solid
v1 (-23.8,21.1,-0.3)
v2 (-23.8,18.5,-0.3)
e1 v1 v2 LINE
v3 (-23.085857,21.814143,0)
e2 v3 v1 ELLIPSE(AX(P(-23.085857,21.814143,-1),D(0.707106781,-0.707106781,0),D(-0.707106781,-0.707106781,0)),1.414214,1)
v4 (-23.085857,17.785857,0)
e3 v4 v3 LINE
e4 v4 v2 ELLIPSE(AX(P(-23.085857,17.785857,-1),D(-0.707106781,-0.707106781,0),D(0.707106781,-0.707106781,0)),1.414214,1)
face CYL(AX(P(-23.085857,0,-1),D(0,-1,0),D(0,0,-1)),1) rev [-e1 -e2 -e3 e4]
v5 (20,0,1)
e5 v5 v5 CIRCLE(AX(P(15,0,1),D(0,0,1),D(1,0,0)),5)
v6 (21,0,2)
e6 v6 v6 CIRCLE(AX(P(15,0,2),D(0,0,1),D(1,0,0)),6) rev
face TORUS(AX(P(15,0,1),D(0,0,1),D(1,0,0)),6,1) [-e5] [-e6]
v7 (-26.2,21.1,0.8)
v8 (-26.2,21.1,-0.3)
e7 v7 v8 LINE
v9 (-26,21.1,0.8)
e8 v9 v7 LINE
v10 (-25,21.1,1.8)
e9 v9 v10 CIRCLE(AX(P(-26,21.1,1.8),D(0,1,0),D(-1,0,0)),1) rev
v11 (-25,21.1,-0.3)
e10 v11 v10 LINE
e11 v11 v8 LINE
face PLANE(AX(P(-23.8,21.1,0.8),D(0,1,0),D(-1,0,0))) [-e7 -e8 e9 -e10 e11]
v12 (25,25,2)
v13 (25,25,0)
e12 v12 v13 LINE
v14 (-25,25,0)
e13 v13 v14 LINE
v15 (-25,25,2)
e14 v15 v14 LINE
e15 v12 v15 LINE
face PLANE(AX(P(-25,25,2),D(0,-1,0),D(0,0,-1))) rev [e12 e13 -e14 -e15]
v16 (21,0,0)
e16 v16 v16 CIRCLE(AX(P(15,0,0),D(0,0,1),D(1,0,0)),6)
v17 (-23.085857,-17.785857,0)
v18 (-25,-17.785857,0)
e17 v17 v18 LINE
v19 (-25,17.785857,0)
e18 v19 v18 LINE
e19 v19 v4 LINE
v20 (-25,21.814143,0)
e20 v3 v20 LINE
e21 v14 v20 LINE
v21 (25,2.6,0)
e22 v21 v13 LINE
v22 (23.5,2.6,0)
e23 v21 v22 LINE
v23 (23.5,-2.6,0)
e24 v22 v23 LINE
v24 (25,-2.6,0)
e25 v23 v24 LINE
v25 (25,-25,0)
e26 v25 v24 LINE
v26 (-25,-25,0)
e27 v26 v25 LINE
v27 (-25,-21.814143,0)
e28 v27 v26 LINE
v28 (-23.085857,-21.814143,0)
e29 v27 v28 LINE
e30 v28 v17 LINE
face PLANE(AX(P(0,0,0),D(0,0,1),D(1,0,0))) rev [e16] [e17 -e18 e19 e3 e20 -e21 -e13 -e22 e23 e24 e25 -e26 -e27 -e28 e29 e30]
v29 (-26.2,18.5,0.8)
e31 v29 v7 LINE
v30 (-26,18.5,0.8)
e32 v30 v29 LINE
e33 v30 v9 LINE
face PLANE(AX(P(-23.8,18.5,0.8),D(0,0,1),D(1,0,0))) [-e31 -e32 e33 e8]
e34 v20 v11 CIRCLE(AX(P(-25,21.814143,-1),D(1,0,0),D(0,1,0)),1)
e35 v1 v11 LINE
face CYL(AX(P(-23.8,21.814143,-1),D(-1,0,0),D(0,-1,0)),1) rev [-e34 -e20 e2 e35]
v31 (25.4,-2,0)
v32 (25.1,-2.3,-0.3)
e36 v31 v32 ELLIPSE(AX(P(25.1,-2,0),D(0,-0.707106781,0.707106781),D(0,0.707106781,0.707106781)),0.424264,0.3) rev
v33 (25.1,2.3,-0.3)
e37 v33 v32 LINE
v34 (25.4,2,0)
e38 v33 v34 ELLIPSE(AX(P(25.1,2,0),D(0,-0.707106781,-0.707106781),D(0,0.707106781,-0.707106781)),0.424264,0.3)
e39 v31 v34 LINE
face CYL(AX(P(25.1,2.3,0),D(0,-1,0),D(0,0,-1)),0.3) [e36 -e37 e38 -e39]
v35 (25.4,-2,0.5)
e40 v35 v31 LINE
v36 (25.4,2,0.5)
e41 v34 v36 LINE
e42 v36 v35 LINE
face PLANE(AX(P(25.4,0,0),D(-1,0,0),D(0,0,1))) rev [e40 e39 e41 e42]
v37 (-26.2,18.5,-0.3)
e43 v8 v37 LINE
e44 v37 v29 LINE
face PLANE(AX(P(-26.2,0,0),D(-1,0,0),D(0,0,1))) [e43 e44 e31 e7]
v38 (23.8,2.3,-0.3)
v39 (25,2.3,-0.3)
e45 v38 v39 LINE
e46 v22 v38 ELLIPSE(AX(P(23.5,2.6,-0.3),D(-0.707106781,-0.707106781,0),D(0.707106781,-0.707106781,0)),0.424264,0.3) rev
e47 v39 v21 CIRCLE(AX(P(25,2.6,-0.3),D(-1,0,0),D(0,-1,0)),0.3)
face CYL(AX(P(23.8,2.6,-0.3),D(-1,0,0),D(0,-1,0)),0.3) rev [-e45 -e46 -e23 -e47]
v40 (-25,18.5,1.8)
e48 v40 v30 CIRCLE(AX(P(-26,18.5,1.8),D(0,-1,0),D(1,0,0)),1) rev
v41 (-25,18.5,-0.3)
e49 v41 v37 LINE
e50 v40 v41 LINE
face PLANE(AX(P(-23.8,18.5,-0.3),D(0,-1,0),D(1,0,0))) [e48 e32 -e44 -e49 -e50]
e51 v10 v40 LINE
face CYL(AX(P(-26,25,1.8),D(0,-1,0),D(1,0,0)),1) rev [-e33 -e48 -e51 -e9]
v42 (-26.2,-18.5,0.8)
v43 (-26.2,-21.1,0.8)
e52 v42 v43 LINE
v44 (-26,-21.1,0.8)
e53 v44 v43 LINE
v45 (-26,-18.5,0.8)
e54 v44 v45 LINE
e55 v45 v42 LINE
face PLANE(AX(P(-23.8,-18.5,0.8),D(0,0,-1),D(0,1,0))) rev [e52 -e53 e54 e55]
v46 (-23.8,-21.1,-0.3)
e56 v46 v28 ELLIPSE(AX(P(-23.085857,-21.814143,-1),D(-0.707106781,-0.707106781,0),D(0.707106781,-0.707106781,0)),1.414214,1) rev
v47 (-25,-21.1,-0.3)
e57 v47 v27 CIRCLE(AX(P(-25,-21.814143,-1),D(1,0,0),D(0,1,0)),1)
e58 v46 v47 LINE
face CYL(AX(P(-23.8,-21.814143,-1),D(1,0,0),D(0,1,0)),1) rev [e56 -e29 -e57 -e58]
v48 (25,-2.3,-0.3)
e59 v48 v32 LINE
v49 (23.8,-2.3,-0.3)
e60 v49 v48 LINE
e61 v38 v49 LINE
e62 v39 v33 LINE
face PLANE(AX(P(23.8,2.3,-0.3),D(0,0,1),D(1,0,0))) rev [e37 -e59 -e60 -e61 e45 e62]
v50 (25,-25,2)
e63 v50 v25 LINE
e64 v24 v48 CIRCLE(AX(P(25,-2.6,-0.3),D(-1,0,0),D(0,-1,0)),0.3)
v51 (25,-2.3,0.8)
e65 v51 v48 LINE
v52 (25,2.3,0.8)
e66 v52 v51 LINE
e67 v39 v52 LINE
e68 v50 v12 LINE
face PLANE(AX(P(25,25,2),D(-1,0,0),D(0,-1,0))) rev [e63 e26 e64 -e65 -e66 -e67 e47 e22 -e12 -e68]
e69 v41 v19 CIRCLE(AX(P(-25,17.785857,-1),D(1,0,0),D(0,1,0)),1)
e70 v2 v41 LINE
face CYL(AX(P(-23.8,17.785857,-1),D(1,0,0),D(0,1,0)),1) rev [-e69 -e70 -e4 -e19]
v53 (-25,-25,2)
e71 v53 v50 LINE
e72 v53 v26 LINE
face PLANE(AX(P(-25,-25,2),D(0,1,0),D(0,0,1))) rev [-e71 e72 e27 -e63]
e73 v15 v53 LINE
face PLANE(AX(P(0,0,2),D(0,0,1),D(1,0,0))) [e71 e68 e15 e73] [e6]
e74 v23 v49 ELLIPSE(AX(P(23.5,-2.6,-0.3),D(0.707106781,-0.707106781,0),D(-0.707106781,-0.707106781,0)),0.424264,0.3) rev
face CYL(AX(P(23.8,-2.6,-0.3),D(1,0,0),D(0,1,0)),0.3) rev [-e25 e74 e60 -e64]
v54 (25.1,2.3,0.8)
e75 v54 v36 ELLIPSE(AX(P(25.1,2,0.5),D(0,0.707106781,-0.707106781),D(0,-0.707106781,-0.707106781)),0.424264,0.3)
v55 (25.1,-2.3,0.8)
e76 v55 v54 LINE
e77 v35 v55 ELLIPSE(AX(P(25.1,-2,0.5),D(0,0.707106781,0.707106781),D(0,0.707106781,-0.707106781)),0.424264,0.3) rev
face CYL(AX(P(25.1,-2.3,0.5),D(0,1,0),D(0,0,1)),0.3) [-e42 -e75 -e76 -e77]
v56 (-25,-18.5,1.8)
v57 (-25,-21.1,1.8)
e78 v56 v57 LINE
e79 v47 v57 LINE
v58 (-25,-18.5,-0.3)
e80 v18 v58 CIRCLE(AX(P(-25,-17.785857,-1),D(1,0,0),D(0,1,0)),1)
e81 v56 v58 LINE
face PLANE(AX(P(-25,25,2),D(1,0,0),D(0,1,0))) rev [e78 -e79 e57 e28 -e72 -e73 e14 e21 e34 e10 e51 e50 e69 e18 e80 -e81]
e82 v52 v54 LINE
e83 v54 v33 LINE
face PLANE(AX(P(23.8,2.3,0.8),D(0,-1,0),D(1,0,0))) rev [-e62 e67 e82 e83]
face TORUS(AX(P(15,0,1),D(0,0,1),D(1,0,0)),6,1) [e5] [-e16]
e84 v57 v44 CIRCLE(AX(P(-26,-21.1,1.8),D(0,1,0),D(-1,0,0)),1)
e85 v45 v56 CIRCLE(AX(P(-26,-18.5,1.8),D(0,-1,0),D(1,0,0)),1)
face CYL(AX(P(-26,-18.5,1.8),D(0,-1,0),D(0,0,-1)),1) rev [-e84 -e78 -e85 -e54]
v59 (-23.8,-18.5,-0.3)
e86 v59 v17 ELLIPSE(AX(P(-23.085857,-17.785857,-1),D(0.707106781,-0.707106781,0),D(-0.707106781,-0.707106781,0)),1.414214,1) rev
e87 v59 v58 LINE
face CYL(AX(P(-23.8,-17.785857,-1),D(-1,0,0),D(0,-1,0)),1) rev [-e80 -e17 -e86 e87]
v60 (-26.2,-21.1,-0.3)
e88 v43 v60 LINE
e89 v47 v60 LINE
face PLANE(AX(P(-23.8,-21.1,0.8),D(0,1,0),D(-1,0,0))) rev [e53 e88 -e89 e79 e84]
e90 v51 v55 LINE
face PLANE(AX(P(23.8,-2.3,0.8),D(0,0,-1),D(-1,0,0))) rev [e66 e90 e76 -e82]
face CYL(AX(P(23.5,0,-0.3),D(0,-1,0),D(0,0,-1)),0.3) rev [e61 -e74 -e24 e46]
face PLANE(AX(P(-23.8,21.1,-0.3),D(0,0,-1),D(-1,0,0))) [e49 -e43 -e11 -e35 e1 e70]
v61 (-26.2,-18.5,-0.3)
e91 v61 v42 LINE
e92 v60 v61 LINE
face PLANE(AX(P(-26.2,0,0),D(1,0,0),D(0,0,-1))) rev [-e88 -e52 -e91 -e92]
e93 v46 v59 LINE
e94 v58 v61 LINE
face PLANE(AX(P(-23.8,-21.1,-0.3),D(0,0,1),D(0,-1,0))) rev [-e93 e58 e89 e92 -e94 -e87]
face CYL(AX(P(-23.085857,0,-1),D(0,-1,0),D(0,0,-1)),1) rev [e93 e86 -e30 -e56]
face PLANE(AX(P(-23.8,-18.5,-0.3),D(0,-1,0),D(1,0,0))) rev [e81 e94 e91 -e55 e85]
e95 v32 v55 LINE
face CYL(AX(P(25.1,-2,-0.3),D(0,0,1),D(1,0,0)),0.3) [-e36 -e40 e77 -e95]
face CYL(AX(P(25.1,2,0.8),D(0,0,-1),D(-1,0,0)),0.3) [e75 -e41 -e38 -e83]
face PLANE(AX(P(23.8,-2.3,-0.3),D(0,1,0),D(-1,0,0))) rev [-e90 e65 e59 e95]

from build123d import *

# Parameters (mm, degrees)
SKETCH1_W                = 50
SKETCH1_H                = 50
BOSS_EXTRUDE1_DEPTH      = 2
BOSS_EXTRUDE2_DEPTH      = 1.2
BOSS_EXTRUDE2_DEPTH_BACK = 1.2
SKETCH3_W                = 1.1
SKETCH3_H                = 2.6
FILLET1_R                = 1
BOSS_EXTRUDE3_DEPTH      = 0.4
BOSS_EXTRUDE3_DEPTH_BACK = 1.2
SKETCH6_W                = 1.1
SKETCH6_H                = 4.6
FILLET2_R                = 0.3
FILLET3_R                = 0.3
CUT_EXTRUDE1_REACH       = 38.287
SKETCH7_R                = 5
FILLET5_R                = 1


# Some blends are built 0.0001 mm under size
with BuildPart() as part:
    # Sketch1 → Boss-Extrude1 (new body)
    with BuildSketch(Plane.XY):
        Rectangle(SKETCH1_W, SKETCH1_H)
    extrude(amount=BOSS_EXTRUDE1_DEPTH)

    # Sketch3 → Boss-Extrude2 (add, two sides: drawn at the far end of the back side and taken through both)
    with BuildSketch(Plane.ZY.offset(25).offset(-BOSS_EXTRUDE2_DEPTH_BACK)):
        with Locations((0.25, 19.8)):
            Rectangle(SKETCH3_W, SKETCH3_H)
        with Locations((0.25, -19.8)):
            Rectangle(SKETCH3_W, SKETCH3_H)
    extrude(amount=BOSS_EXTRUDE2_DEPTH + BOSS_EXTRUDE2_DEPTH_BACK)

    # Fillet1
    # the kernel refuses this fillet: 1 mm, written as the material it adds along each edge
    with BuildSketch(Plane(origin=(-23.8, 21.1, 0), x_dir=(0, 1, 0), z_dir=(-1, 0, 0)), Plane(origin=(-25, 18.5, 0), x_dir=(0, -1, 0), z_dir=(1, 0, 0))) as fillet1_piece_1:
        with BuildLine():
            CenterArc((0.714142843, 1), FILLET1_R, 224.427004001, 45.572995999)
            Line((0, 0.3), (-0.014282857, 0.286))
            ThreePointArc((-0.014282857, 0.286), (-0.02, 0.15), (-0.02, 0))
            Line((-0.02, 0), (0, -0.02))
            Line((0, -0.02), (0.714142843, -0.02))
            Line((0.714142843, -0.02), (0.714142843, 0))
        make_face()
    extrude(amount=1.2)
    with BuildSketch(Plane(origin=(-23.8, -21.1, 0), x_dir=(0, -1, 0), z_dir=(-1, 0, 0)), Plane(origin=(-25, -18.5, 0), x_dir=(0, 1, 0), z_dir=(1, 0, 0))) as fillet1_piece_2:
        with BuildLine():
            CenterArc((0.714142843, -1), FILLET1_R, 90, 45.572995999)
            Line((0, -0.3), (-0.014282857, -0.286))
            ThreePointArc((-0.014282857, -0.286), (-0.02, -0.15), (-0.02, 0))
            Line((-0.02, 0), (0, 0.02))
            Line((0, 0.02), (0.714142843, 0.02))
            Line((0.714142843, 0.02), (0.714142843, 0))
        make_face()
    extrude(amount=1.2)
    with BuildSketch(Plane(origin=(-23.8, -18.5, 0), x_dir=(1, 0, 0), z_dir=(0, -1, 0))) as fillet1_piece_3:
        with BuildLine():
            CenterArc((0.714142843, -1), FILLET1_R, 90, 45.572995999)
            Line((0, -0.3), (-0.014282857, -0.286))
            ThreePointArc((-0.014282857, -0.286), (-0.02, -0.15), (-0.02, 0))
            Line((-0.02, 0), (0, 0.02))
            Line((0, 0.02), (0.714142843, 0.02))
            Line((0.714142843, 0.02), (0.714142843, 0))
        make_face()
    extrude(amount=2.6)
    with BuildSketch(Plane(origin=(-23.8, 18.5, 0), x_dir=(1, 0, 0), z_dir=(0, 1, 0))) as fillet1_piece_4:
        with BuildLine():
            CenterArc((0.714142843, 1), FILLET1_R, 224.427004001, 45.572995999)
            Line((0, 0.3), (-0.014282857, 0.286))
            ThreePointArc((-0.014282857, 0.286), (-0.02, 0.15), (-0.02, 0))
            Line((-0.02, 0), (0, -0.02))
            Line((0, -0.02), (0.714142843, -0.02))
            Line((0.714142843, -0.02), (0.714142843, 0))
        make_face()
    extrude(amount=2.6)
    with BuildSketch(Plane(origin=(-25, -21.1, 0.8), x_dir=(0, 0, 1), z_dir=(0, 1, 0))) as fillet1_piece_5:
        with BuildLine():
            CenterArc((FILLET1_R, -FILLET1_R), FILLET1_R, 90, 90)
            Line((0, -FILLET1_R), (-FILLET1_R * 0.02, -FILLET1_R))
            Line((-FILLET1_R * 0.02, -FILLET1_R), (-FILLET1_R * 0.02, FILLET1_R * 0.02))
            Line((-FILLET1_R * 0.02, FILLET1_R * 0.02), (FILLET1_R, FILLET1_R * 0.02))
            Line((FILLET1_R, FILLET1_R * 0.02), (FILLET1_R, 0))
        make_face()
    extrude(amount=2.6)
    with BuildSketch(Plane(origin=(-25, 21.1, 0.8), x_dir=(0, 0, 1), z_dir=(0, -1, 0))) as fillet1_piece_6:
        with BuildLine():
            CenterArc((FILLET1_R, FILLET1_R), FILLET1_R, 180, 90)
            Line((0, FILLET1_R), (-FILLET1_R * 0.02, FILLET1_R))
            Line((-FILLET1_R * 0.02, FILLET1_R), (-FILLET1_R * 0.02, -FILLET1_R * 0.02))
            Line((-FILLET1_R * 0.02, -FILLET1_R * 0.02), (FILLET1_R, -FILLET1_R * 0.02))
            Line((FILLET1_R, -FILLET1_R * 0.02), (FILLET1_R, 0))
        make_face()
    extrude(amount=2.6)
    with BuildSketch(Plane(origin=(-22.014642893, 21.1, 0), x_dir=(0, 1, 0), z_dir=(-1, 0, 0))) as fillet1_piece_7a_section:
        with BuildLine():
            CenterArc((0.714142843, 1), FILLET1_R, 224.427004001, 45.572995999)
            Line((0, 0.3), (-0.014282857, 0.286))
            ThreePointArc((-0.014282857, 0.286), (-0.02, 0.15), (-0.02, 0))
            Line((-0.02, 0), (0, -0.02))
            Line((0, -0.02), (0.714142843, -0.02))
            Line((0.714142843, -0.02), (0.714142843, 0))
        make_face()
    fillet1_piece_7a = extrude(amount=2.985357107, mode=Mode.PRIVATE)
    fillet1_piece_7a = split(fillet1_piece_7a, bisect_by=Plane(origin=(-23.8, 21.290996304, -0.074177971), z_dir=(1, 0, 0)), keep=Keep.TOP, mode=Mode.PRIVATE)
    with BuildSketch(Plane(origin=(-23.8, 18.5, 0), x_dir=(1, 0, 0), z_dir=(0, 1, 0))) as fillet1_piece_7b_section:
        with BuildLine():
            CenterArc((0.714142843, 1), FILLET1_R, 224.427004001, 45.572995999)
            Line((0, 0.3), (-0.014282857, 0.286))
            ThreePointArc((-0.014282857, 0.286), (-0.02, 0.15), (-0.02, 0))
            Line((-0.02, 0), (0, -0.02))
            Line((0, -0.02), (0.714142843, -0.02))
            Line((0.714142843, -0.02), (0.714142843, 0))
        make_face()
    fillet1_piece_7b = extrude(amount=4.385357107, mode=Mode.PRIVATE)
    fillet1_piece_7b = split(fillet1_piece_7b, bisect_by=Plane(origin=(-23.609003696, 21.1, -0.074177971), z_dir=(0, 1, 0)), keep=Keep.TOP, mode=Mode.PRIVATE)
    fillet1_piece_7 = fillet1_piece_7a & fillet1_piece_7b
    add(fillet1_piece_7)
    with BuildSketch(Plane(origin=(-23.8, 16.714642893, 0), x_dir=(1, 0, 0), z_dir=(0, 1, 0))) as fillet1_piece_8a_section:
        with BuildLine():
            CenterArc((0.714142843, 1), FILLET1_R, 224.427004001, 45.572995999)
            Line((0, 0.3), (-0.014282857, 0.286))
            ThreePointArc((-0.014282857, 0.286), (-0.02, 0.15), (-0.02, 0))
            Line((-0.02, 0), (0, -0.02))
            Line((0, -0.02), (0.714142843, -0.02))
            Line((0.714142843, -0.02), (0.714142843, 0))
        make_face()
    fillet1_piece_8a = extrude(amount=4.385357107, mode=Mode.PRIVATE)
    fillet1_piece_8a = split(fillet1_piece_8a, bisect_by=Plane(origin=(-23.609003696, 18.5, -0.074177971), z_dir=(0, -1, 0)), keep=Keep.TOP, mode=Mode.PRIVATE)
    with BuildSketch(Plane(origin=(-25, 18.5, 0), x_dir=(0, -1, 0), z_dir=(1, 0, 0))) as fillet1_piece_8b_section:
        with BuildLine():
            CenterArc((0.714142843, 1), FILLET1_R, 224.427004001, 45.572995999)
            Line((0, 0.3), (-0.014282857, 0.286))
            ThreePointArc((-0.014282857, 0.286), (-0.02, 0.15), (-0.02, 0))
            Line((-0.02, 0), (0, -0.02))
            Line((0, -0.02), (0.714142843, -0.02))
            Line((0.714142843, -0.02), (0.714142843, 0))
        make_face()
    fillet1_piece_8b = extrude(amount=2.985357107, mode=Mode.PRIVATE)
    fillet1_piece_8b = split(fillet1_piece_8b, bisect_by=Plane(origin=(-23.8, 18.309003696, -0.074177971), z_dir=(1, 0, 0)), keep=Keep.TOP, mode=Mode.PRIVATE)
    fillet1_piece_8 = fillet1_piece_8a & fillet1_piece_8b
    add(fillet1_piece_8)
    with BuildSketch(Plane(origin=(-23.8, -18.5, 0), x_dir=(1, 0, 0), z_dir=(0, -1, 0))) as fillet1_piece_9a_section:
        with BuildLine():
            CenterArc((0.714142843, -1), FILLET1_R, 90, 45.572995999)
            Line((0, -0.3), (-0.014282857, -0.286))
            ThreePointArc((-0.014282857, -0.286), (-0.02, -0.15), (-0.02, 0))
            Line((-0.02, 0), (0, 0.02))
            Line((0, 0.02), (0.714142843, 0.02))
            Line((0.714142843, 0.02), (0.714142843, 0))
        make_face()
    fillet1_piece_9a = extrude(amount=4.385357107, mode=Mode.PRIVATE)
    fillet1_piece_9a = split(fillet1_piece_9a, bisect_by=Plane(origin=(-23.609003696, -21.1, -0.074177971), z_dir=(0, -1, 0)), keep=Keep.TOP, mode=Mode.PRIVATE)
    with BuildSketch(Plane(origin=(-22.014642893, -21.1, 0), x_dir=(0, -1, 0), z_dir=(-1, 0, 0))) as fillet1_piece_9b_section:
        with BuildLine():
            CenterArc((0.714142843, -1), FILLET1_R, 90, 45.572995999)
            Line((0, -0.3), (-0.014282857, -0.286))
            ThreePointArc((-0.014282857, -0.286), (-0.02, -0.15), (-0.02, 0))
            Line((-0.02, 0), (0, 0.02))
            Line((0, 0.02), (0.714142843, 0.02))
            Line((0.714142843, 0.02), (0.714142843, 0))
        make_face()
    fillet1_piece_9b = extrude(amount=2.985357107, mode=Mode.PRIVATE)
    fillet1_piece_9b = split(fillet1_piece_9b, bisect_by=Plane(origin=(-23.8, -21.290996304, -0.074177971), z_dir=(1, 0, 0)), keep=Keep.TOP, mode=Mode.PRIVATE)
    fillet1_piece_9 = fillet1_piece_9a & fillet1_piece_9b
    add(fillet1_piece_9)
    with BuildSketch(Plane(origin=(-25, -18.5, 0), x_dir=(0, 1, 0), z_dir=(1, 0, 0))) as fillet1_piece_10a_section:
        with BuildLine():
            CenterArc((0.714142843, -1), FILLET1_R, 90, 45.572995999)
            Line((0, -0.3), (-0.014282857, -0.286))
            ThreePointArc((-0.014282857, -0.286), (-0.02, -0.15), (-0.02, 0))
            Line((-0.02, 0), (0, 0.02))
            Line((0, 0.02), (0.714142843, 0.02))
            Line((0.714142843, 0.02), (0.714142843, 0))
        make_face()
    fillet1_piece_10a = extrude(amount=2.985357107, mode=Mode.PRIVATE)
    fillet1_piece_10a = split(fillet1_piece_10a, bisect_by=Plane(origin=(-23.8, -18.309003696, -0.074177971), z_dir=(1, 0, 0)), keep=Keep.TOP, mode=Mode.PRIVATE)
    with BuildSketch(Plane(origin=(-23.8, -16.714642893, 0), x_dir=(1, 0, 0), z_dir=(0, -1, 0))) as fillet1_piece_10b_section:
        with BuildLine():
            CenterArc((0.714142843, -1), FILLET1_R, 90, 45.572995999)
            Line((0, -0.3), (-0.014282857, -0.286))
            ThreePointArc((-0.014282857, -0.286), (-0.02, -0.15), (-0.02, 0))
            Line((-0.02, 0), (0, 0.02))
            Line((0, 0.02), (0.714142843, 0.02))
            Line((0.714142843, 0.02), (0.714142843, 0))
        make_face()
    fillet1_piece_10b = extrude(amount=4.385357107, mode=Mode.PRIVATE)
    fillet1_piece_10b = split(fillet1_piece_10b, bisect_by=Plane(origin=(-23.609003696, -18.5, -0.074177971), z_dir=(0, 1, 0)), keep=Keep.TOP, mode=Mode.PRIVATE)
    fillet1_piece_10 = fillet1_piece_10a & fillet1_piece_10b
    add(fillet1_piece_10)

    # Sketch6 → Boss-Extrude3 (add, two sides: drawn at the far end of the back side and taken through both)
    with BuildSketch(Plane(origin=(25, 0, 0), x_dir=(0, 0, -1), z_dir=(1, 0, 0)).offset(-BOSS_EXTRUDE3_DEPTH_BACK)):
        with Locations((-0.25, 0)):
            Rectangle(SKETCH6_W, SKETCH6_H)
    extrude(amount=BOSS_EXTRUDE3_DEPTH + BOSS_EXTRUDE3_DEPTH_BACK)

    # Fillet2
    fillet2_edges = [part.edges().sort_by_distance(p)[0] for p in [
        (25.4, 2.3, 0.25),
        (25.4, -2.3, 0.25),
        (25.4, 0, 0.8),
        (25.4, 0, -0.3),
    ]]
    fillet(fillet2_edges, radius=FILLET2_R)

    # Fillet3
    fillet3_edges = [part.edges().sort_by_distance(p)[0] for p in [
        (24.4, -2.3, 0),
        (24.4, 2.3, 0),
        (23.8, 0, 0),
    ]]
    fillet(fillet3_edges, radius=FILLET3_R - 0.0001)  # a hair under: the kernel refuses the full size

    # Sketch7 → Cut-Extrude1 (cut, up to next)
    with BuildSketch(Plane.XY.offset(2), mode=Mode.PRIVATE) as cut_extrude1_sk1:
        with Locations((15, 0)):
            Circle(SKETCH7_R)
    cut_extrude1_tool1 = extrude(cut_extrude1_sk1.sketch, amount=-CUT_EXTRUDE1_REACH, mode=Mode.PRIVATE) & part.part
    add(cut_extrude1_tool1.solids().sort_by_distance((15, 0, 2))[0], mode=Mode.SUBTRACT)

    # Fillet5
    fillet5_edges = [part.edges().sort_by_distance(p)[0] for p in [
        (10, 0, 2),
        (10, 0, 0),
    ]]
    fillet(fillet5_edges, radius=FILLET5_R - 0.0001)  # a hair under: the kernel refuses the full size


solid = part.part
